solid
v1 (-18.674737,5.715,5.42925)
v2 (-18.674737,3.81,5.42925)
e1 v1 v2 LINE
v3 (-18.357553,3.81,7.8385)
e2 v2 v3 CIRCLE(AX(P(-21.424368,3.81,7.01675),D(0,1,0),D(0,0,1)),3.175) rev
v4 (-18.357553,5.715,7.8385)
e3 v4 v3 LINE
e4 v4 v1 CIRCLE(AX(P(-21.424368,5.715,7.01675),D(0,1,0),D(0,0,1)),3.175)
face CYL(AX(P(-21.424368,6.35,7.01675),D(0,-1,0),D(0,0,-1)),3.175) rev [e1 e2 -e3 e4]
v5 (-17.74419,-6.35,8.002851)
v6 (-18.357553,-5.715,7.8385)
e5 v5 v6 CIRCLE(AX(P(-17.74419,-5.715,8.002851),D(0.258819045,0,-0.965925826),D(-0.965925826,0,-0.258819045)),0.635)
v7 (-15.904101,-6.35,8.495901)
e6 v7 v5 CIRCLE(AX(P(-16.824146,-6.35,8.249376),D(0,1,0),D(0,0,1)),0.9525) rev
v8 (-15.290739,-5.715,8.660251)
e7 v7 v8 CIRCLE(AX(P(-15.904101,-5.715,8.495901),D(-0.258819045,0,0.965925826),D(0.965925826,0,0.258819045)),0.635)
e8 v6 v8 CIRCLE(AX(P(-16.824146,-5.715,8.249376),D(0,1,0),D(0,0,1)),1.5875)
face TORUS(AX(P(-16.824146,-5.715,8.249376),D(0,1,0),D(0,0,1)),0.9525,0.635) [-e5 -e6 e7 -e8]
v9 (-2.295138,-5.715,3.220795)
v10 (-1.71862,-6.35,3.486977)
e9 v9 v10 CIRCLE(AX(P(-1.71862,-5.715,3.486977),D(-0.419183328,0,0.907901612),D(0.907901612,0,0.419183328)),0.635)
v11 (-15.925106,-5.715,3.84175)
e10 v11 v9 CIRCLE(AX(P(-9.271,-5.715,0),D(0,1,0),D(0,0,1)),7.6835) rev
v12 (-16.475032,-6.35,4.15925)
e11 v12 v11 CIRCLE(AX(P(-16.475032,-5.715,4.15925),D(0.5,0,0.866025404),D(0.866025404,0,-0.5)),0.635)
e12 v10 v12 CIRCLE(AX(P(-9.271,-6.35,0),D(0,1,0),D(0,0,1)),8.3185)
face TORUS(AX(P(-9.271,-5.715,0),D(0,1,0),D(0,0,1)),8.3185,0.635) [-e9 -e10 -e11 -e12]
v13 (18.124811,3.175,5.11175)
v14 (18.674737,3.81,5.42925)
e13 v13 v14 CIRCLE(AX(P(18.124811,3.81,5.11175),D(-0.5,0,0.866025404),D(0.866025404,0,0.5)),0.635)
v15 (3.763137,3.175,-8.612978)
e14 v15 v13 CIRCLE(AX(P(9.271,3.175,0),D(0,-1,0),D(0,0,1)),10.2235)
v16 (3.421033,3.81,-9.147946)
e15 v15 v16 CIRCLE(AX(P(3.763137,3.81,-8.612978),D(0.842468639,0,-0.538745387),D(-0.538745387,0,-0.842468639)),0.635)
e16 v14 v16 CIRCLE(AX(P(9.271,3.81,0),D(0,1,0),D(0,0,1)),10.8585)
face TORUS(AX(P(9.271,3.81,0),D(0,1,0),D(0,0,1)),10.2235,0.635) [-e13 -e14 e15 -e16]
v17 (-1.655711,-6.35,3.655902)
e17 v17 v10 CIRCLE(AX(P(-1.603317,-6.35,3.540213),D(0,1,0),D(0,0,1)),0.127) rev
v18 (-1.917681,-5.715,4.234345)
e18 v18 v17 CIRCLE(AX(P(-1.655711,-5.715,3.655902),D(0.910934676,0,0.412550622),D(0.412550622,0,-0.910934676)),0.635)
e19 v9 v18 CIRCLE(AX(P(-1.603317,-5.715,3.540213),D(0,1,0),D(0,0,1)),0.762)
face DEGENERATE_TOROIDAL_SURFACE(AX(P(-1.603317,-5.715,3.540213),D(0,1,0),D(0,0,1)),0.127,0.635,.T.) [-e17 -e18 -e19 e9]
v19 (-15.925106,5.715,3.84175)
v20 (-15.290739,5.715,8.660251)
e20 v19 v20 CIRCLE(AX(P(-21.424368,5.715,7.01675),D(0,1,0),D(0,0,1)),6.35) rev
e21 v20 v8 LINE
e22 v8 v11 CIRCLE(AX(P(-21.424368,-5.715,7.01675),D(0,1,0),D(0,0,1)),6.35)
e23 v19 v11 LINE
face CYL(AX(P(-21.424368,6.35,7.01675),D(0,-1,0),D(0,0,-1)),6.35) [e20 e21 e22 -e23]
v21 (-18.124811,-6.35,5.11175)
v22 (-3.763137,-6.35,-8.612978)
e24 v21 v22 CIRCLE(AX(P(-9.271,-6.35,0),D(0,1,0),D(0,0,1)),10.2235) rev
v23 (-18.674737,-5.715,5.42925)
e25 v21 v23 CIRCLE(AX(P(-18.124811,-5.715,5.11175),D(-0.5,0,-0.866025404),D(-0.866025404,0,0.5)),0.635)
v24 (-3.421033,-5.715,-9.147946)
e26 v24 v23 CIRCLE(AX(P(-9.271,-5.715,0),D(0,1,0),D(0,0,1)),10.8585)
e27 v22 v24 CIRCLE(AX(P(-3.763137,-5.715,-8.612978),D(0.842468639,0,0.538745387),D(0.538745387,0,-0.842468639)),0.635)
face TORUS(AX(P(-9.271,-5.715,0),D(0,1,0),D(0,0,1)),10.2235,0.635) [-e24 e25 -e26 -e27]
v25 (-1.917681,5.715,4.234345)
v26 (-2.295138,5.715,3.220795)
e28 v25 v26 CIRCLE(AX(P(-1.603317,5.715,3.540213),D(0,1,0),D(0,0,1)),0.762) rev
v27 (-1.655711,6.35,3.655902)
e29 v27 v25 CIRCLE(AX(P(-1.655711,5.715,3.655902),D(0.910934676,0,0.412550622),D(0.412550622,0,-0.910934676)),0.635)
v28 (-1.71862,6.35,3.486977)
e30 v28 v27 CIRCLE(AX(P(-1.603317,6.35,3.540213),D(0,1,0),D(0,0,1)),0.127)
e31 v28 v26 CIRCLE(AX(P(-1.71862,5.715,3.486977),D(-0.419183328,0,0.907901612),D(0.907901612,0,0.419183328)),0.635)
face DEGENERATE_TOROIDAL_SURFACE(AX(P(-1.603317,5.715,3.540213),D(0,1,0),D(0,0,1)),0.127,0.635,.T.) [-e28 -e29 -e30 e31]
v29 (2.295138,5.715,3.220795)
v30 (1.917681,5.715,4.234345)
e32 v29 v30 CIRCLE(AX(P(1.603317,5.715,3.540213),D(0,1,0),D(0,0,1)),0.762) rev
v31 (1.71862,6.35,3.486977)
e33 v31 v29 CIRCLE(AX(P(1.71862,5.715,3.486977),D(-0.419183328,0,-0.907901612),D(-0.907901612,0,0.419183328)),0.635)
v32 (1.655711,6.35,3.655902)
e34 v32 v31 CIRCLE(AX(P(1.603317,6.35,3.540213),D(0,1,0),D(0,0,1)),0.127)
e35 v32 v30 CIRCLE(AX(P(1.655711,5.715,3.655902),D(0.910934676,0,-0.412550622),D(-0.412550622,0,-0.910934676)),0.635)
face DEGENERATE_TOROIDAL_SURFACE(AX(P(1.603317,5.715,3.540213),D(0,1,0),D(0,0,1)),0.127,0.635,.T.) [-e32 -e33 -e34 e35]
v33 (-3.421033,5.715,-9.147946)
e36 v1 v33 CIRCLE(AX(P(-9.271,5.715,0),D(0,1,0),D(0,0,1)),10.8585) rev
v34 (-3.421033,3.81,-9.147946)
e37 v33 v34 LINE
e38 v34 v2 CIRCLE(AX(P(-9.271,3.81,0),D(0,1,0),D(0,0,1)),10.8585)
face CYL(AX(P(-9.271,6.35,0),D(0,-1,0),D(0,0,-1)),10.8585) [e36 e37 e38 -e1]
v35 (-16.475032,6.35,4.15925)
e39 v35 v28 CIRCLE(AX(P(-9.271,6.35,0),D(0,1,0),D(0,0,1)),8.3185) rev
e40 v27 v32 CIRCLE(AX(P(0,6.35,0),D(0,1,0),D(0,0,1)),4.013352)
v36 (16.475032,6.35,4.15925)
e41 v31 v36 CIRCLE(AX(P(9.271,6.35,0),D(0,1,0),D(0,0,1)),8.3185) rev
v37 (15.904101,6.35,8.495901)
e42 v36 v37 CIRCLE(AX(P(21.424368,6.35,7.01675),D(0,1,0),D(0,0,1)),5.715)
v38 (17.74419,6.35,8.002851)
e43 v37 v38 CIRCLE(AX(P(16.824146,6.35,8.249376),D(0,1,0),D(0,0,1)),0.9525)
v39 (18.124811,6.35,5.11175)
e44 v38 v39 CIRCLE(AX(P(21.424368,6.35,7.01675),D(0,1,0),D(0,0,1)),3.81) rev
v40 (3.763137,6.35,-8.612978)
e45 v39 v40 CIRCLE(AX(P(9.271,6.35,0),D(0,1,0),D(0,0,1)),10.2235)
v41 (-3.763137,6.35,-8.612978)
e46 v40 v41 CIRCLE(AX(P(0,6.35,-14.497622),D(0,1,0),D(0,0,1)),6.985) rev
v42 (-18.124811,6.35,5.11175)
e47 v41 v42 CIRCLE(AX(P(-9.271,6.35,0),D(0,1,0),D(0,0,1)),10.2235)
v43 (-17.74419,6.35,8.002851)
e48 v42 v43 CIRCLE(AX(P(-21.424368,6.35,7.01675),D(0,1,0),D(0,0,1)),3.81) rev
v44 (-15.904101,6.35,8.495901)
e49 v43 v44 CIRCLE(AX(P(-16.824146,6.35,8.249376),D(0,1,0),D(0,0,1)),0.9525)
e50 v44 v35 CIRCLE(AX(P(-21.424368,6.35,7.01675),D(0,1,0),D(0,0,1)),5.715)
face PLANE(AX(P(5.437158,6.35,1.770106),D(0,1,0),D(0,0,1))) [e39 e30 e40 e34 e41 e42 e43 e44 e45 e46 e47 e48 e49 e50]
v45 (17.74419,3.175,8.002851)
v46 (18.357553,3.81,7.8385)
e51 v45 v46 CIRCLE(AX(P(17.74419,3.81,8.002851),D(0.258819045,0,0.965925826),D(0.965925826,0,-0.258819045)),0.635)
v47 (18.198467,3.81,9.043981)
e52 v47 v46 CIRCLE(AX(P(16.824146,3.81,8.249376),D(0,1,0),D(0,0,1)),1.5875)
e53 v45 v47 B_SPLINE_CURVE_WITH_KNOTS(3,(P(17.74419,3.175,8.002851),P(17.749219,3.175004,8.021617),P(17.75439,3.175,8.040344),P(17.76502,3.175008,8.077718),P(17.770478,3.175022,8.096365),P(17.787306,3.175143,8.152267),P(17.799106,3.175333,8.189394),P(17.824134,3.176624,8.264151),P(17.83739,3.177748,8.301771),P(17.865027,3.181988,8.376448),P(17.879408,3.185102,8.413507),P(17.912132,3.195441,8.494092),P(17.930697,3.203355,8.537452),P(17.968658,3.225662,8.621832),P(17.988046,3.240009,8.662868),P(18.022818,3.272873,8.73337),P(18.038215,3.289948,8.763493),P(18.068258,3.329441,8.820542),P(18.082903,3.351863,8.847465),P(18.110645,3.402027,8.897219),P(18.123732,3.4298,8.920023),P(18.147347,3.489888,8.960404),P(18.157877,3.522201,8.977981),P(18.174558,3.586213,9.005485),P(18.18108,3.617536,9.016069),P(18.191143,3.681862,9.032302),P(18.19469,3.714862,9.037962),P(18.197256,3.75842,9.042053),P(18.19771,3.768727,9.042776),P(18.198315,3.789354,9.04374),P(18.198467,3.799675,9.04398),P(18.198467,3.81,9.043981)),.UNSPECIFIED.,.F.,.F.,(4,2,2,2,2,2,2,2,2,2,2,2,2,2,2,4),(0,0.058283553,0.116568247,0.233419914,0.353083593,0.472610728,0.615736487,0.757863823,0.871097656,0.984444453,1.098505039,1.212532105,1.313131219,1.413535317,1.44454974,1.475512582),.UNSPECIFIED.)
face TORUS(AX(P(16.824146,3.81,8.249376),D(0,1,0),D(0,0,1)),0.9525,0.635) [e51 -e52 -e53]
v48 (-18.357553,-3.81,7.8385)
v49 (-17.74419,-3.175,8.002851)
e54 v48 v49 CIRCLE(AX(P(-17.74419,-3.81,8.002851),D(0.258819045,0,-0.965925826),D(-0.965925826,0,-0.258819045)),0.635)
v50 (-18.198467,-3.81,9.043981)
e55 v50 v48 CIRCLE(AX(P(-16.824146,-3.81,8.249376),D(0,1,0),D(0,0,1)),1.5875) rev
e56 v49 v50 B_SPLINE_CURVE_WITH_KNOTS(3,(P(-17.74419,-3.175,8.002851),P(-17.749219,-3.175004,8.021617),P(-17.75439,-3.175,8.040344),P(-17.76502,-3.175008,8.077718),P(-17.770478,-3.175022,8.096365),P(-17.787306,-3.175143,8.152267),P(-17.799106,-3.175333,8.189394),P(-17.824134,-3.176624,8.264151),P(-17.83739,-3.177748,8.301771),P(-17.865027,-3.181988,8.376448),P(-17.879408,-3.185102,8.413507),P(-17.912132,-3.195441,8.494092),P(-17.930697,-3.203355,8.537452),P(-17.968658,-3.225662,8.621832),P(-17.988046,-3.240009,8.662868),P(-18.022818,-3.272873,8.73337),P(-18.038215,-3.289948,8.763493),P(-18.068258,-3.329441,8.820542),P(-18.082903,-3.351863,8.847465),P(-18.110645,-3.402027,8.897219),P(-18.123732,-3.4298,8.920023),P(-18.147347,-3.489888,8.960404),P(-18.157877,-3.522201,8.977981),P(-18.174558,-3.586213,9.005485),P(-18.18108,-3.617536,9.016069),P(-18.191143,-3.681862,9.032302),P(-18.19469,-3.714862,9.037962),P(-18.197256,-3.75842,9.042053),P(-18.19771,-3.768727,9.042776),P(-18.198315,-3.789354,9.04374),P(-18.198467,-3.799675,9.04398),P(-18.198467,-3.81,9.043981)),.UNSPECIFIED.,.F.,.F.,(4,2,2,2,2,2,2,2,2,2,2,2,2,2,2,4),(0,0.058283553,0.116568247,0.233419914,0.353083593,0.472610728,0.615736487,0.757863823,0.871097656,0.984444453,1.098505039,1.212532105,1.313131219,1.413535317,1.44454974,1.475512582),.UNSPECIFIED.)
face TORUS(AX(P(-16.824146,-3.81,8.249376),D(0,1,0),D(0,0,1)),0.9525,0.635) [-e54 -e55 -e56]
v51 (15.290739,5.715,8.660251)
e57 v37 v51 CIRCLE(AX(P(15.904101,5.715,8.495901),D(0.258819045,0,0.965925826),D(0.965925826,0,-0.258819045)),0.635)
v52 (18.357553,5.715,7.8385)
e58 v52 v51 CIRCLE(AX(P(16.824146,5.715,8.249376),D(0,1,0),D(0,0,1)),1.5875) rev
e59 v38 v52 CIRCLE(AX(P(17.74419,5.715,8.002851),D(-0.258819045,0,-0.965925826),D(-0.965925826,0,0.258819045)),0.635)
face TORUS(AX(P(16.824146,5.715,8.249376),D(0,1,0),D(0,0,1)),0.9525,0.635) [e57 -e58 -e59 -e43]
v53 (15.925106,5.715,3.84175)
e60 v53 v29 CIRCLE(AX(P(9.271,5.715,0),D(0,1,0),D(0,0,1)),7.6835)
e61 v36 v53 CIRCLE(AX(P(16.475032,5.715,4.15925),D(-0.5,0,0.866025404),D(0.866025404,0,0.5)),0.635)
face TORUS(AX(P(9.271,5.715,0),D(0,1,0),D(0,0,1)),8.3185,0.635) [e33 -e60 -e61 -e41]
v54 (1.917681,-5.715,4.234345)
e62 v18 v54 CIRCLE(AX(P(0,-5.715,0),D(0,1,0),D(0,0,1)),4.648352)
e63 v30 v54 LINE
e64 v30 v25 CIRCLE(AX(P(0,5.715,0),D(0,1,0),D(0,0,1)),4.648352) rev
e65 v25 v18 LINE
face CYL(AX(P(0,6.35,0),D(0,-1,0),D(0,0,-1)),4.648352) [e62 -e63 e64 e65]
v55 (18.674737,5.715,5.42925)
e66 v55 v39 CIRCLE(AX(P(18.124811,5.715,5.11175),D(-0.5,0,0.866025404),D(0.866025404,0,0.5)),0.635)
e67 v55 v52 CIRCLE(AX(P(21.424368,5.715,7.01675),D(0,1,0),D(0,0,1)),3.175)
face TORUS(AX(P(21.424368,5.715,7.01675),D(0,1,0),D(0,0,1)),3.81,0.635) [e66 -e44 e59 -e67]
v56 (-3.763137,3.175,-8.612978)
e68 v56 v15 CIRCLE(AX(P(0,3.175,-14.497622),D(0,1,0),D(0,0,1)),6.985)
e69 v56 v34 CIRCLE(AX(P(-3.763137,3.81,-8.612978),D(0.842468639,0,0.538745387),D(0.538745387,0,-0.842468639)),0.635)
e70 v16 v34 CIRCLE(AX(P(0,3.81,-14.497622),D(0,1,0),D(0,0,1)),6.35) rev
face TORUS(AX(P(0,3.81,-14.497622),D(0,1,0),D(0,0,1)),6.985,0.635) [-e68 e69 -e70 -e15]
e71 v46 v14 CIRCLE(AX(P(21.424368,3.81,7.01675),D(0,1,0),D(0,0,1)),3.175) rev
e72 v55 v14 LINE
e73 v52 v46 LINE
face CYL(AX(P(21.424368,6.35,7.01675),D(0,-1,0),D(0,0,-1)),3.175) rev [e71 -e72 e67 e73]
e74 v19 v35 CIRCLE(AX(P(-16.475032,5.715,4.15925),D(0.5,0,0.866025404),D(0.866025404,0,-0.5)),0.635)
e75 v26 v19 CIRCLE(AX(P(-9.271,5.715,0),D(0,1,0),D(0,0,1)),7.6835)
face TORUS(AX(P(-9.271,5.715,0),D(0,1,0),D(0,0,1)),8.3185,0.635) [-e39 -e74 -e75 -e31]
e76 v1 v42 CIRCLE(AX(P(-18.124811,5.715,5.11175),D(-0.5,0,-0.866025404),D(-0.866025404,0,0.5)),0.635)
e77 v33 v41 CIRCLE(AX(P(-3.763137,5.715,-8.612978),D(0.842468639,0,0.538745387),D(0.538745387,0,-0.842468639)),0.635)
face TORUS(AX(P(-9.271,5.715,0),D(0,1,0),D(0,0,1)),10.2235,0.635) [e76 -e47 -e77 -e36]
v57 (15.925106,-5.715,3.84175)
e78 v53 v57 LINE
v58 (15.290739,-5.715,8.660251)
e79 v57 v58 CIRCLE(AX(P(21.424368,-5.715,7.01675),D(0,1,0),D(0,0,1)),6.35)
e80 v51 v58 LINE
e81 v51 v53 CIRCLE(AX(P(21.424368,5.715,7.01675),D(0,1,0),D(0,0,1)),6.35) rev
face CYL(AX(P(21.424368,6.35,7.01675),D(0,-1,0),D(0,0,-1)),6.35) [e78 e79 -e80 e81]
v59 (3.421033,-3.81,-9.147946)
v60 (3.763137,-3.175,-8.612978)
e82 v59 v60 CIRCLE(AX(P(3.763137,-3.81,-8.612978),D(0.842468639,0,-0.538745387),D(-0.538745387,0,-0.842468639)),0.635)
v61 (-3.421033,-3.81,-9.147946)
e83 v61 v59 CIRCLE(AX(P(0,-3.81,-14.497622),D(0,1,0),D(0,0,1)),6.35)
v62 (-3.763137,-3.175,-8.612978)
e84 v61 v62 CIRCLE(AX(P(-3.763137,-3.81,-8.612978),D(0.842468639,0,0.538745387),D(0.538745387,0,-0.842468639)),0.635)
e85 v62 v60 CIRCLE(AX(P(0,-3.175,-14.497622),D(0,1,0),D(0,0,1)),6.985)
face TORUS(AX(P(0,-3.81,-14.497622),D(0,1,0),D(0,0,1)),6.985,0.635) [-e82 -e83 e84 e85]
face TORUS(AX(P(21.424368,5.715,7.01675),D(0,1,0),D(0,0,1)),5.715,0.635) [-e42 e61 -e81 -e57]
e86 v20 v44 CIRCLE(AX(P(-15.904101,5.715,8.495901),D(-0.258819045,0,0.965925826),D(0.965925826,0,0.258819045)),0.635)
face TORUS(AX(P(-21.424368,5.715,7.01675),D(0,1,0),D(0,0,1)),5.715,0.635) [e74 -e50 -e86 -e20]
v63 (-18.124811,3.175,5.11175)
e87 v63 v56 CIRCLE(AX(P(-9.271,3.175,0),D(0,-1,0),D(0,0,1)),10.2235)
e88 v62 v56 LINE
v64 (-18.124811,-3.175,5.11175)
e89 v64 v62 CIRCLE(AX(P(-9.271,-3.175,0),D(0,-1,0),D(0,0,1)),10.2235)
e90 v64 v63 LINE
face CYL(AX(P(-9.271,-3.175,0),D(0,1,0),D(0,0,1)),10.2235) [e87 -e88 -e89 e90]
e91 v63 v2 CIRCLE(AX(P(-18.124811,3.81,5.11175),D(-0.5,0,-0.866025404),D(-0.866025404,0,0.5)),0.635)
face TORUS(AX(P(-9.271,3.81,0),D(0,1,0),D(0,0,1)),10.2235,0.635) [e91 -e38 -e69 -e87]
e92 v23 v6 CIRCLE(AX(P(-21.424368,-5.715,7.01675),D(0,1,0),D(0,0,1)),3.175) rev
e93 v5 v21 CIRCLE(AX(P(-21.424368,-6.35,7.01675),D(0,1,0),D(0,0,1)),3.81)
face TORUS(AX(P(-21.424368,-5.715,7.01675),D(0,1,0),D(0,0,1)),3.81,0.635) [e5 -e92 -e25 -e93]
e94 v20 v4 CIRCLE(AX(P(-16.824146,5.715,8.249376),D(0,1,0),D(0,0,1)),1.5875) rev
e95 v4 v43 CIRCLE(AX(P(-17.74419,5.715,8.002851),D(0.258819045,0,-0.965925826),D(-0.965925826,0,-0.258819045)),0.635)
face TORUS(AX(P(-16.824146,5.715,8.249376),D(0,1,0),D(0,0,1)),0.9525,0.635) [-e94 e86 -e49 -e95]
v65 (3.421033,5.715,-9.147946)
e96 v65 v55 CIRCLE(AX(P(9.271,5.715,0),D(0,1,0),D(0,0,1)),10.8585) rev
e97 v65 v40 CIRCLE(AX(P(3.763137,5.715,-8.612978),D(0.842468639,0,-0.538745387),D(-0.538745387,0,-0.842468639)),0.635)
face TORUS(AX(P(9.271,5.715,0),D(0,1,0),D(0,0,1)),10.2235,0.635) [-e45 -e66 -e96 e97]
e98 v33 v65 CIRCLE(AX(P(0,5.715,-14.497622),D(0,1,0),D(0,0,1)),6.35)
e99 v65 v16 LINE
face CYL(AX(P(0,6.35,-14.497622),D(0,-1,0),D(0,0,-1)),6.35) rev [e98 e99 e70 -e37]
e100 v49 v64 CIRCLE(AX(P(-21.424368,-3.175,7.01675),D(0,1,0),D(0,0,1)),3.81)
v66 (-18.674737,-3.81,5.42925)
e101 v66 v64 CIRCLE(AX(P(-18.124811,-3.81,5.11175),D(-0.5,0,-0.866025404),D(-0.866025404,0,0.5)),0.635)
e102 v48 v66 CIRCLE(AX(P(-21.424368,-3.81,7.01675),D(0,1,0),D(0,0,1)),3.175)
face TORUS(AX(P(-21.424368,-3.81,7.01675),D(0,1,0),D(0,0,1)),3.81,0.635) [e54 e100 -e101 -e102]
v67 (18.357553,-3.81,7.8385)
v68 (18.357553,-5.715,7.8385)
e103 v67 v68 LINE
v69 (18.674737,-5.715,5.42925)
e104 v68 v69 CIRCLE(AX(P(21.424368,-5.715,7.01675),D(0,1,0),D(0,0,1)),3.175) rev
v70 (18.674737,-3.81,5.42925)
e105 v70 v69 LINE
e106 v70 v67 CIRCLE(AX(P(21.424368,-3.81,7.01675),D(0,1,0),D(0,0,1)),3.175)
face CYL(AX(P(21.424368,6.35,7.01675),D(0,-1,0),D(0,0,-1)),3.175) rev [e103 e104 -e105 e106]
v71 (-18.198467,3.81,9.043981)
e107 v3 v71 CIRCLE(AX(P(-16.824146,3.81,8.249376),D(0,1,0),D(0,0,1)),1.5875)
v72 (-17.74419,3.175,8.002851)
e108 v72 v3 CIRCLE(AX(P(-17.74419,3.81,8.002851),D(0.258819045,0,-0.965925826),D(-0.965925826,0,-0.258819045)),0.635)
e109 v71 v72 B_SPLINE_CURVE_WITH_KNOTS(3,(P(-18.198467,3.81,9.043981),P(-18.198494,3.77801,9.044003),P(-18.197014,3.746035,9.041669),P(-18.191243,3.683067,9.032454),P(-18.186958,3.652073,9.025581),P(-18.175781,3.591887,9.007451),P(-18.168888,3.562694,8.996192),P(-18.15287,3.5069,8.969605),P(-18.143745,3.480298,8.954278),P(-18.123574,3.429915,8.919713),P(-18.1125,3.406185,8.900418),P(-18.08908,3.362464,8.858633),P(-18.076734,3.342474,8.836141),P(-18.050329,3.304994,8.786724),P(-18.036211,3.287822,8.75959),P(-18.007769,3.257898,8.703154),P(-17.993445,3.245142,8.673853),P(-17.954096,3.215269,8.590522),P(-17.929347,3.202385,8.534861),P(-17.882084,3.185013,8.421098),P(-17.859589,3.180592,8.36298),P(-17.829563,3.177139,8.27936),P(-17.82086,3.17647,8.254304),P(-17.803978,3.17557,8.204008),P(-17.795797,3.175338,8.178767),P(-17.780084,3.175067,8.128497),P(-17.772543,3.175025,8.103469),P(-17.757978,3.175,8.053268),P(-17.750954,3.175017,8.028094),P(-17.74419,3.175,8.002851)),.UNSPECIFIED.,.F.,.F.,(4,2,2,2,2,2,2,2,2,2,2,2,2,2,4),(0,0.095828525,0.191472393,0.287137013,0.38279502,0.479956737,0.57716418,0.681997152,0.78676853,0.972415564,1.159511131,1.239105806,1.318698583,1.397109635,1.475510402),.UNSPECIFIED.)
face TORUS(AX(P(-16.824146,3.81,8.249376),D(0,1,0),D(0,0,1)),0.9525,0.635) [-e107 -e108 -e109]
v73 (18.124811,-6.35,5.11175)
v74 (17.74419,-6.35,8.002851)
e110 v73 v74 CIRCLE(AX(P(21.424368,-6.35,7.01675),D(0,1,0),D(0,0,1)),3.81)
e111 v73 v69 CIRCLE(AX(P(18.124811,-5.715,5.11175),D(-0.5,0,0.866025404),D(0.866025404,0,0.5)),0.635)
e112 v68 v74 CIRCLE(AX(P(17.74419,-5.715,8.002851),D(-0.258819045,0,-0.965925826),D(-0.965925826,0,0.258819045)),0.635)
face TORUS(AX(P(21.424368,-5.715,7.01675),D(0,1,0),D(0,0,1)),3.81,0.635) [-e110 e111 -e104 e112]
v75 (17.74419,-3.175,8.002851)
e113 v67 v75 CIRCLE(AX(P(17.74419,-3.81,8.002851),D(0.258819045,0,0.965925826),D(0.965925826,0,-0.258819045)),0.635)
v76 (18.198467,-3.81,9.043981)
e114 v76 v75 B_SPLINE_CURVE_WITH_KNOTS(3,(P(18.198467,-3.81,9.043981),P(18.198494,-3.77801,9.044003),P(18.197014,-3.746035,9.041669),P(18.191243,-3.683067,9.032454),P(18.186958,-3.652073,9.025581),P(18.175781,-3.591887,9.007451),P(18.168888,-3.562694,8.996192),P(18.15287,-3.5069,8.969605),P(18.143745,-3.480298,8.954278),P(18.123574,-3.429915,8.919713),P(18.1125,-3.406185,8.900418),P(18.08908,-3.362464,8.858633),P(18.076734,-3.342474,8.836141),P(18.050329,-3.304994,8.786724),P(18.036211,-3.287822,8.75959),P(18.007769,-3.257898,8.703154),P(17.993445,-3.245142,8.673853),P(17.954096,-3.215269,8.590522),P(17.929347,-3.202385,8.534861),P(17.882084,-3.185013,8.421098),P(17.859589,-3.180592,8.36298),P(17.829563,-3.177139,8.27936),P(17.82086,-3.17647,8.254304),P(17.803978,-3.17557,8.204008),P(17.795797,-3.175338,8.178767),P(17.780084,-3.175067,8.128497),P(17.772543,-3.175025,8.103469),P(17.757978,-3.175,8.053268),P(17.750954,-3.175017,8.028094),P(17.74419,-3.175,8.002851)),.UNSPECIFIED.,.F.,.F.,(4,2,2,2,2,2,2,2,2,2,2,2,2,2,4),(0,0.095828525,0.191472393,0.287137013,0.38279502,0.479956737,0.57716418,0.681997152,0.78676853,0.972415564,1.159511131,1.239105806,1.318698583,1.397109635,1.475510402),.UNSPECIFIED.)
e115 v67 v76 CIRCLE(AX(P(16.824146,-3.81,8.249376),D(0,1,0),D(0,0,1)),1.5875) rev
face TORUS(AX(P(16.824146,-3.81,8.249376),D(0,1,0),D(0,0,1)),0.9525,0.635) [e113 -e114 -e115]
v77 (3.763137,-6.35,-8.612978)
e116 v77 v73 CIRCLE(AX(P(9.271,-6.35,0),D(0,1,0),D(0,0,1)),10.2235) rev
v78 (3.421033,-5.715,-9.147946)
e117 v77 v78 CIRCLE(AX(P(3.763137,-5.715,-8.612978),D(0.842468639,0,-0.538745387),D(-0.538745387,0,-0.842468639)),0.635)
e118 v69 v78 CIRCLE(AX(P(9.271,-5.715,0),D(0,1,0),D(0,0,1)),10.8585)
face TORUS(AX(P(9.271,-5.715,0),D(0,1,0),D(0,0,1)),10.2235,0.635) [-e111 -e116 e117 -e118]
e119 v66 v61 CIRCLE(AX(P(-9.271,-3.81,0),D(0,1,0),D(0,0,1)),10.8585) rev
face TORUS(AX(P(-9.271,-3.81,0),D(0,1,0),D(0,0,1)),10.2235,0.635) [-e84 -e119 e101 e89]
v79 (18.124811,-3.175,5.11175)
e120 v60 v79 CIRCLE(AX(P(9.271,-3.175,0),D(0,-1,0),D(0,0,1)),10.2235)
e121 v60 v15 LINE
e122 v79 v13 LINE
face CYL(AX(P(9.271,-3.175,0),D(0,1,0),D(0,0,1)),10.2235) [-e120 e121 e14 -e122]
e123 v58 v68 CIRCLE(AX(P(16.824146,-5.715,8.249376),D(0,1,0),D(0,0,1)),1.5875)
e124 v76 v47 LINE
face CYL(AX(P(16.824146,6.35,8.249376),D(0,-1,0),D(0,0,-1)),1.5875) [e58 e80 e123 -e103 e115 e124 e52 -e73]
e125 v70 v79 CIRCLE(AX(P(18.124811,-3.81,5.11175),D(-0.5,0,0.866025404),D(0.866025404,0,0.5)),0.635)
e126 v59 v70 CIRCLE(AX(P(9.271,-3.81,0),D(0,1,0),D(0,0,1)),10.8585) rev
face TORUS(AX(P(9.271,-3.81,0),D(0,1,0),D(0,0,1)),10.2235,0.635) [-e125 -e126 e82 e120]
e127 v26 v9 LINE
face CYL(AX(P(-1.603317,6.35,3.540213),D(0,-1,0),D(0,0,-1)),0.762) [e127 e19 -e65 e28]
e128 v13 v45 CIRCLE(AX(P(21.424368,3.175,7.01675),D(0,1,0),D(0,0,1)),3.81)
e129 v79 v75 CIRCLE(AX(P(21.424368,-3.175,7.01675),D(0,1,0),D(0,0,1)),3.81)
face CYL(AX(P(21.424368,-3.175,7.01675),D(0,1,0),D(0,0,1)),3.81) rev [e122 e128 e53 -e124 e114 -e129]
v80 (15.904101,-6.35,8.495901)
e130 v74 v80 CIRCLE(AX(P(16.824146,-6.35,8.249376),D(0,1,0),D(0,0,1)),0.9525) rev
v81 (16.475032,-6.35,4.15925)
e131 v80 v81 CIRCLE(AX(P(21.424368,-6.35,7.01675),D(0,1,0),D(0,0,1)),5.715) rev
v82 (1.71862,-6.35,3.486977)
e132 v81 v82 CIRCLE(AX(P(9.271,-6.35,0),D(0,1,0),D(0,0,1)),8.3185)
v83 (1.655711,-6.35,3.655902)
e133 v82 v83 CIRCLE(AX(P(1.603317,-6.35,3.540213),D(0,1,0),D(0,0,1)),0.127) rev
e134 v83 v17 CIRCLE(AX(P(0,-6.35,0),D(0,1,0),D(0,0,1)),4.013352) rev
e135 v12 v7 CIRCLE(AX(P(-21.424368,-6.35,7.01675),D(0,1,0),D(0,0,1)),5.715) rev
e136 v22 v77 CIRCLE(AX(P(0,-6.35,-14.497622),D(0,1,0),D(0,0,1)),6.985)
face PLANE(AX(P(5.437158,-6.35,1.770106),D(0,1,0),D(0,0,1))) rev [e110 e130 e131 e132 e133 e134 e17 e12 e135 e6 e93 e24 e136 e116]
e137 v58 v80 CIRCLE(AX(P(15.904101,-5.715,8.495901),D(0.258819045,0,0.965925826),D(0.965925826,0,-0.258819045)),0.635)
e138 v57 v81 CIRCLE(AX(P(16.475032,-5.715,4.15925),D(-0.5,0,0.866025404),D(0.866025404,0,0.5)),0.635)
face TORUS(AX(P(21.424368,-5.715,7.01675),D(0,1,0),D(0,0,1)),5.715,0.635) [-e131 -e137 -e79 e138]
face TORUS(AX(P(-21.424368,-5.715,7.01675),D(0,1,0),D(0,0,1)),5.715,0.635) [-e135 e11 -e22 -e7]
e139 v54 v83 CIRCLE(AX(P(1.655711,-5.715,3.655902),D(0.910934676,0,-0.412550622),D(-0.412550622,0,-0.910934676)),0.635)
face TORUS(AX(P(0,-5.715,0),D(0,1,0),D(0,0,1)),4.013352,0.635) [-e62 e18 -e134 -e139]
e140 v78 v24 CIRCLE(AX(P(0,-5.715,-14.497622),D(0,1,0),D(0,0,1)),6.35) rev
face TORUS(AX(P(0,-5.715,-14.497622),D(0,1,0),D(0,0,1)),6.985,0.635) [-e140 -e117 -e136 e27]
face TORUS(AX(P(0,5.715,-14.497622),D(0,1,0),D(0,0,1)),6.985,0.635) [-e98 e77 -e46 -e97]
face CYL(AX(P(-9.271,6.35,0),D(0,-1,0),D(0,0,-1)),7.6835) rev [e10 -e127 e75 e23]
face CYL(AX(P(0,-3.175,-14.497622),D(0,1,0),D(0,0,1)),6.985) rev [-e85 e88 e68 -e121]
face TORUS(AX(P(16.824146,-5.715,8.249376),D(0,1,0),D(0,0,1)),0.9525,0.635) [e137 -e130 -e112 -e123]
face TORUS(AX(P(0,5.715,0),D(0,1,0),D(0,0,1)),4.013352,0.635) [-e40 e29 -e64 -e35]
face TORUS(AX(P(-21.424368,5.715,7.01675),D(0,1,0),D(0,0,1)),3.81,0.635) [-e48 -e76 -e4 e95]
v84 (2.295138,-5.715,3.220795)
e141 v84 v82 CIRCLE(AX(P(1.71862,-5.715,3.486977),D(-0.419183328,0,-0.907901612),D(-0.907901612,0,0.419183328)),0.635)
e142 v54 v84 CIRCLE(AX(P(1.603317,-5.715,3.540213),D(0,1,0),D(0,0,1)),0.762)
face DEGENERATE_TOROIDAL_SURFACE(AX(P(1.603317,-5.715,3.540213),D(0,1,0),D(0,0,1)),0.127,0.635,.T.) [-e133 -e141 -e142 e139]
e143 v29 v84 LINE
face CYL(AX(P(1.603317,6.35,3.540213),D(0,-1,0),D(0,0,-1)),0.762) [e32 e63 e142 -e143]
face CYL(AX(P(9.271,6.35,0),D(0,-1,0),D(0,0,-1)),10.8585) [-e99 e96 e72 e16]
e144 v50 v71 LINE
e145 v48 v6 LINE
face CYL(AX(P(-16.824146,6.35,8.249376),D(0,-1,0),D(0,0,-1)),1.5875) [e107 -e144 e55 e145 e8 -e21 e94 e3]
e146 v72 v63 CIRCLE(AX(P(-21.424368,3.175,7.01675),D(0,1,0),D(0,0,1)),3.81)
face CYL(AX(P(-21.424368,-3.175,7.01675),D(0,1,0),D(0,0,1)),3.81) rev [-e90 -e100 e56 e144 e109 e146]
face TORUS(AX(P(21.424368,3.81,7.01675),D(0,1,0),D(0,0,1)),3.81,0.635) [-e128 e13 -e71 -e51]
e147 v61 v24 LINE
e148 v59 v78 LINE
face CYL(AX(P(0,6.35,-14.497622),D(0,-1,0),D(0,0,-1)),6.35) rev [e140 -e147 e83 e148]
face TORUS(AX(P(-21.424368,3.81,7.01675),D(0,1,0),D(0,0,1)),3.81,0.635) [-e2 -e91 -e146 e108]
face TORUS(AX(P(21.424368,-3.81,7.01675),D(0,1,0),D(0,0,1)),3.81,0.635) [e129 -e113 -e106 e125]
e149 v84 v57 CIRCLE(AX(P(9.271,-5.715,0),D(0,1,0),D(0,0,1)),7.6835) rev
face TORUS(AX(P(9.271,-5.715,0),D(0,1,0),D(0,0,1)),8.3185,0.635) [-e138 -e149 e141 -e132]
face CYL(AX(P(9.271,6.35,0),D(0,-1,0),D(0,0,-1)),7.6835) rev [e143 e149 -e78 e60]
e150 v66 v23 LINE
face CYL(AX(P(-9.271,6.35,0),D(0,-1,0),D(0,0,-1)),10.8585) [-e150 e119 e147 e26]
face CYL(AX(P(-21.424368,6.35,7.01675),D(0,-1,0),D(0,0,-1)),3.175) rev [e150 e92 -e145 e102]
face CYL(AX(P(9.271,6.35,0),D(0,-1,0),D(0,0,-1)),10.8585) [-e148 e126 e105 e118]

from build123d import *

# Parameters (mm, degrees)
BOSS_EXTRUDE1_DEPTH = 6.35
FILLET1_R           = 0.635
CUT_EXTRUDE1_DEPTH  = 3.175
FILLET2_R           = 0.635


with BuildPart() as part:
    # Sketch1 → Boss-Extrude1 (new, symmetric)
    with BuildSketch(Plane(origin=(0, 0, 0), x_dir=(1, 0, 0), z_dir=(0, 1, 0))):
        with BuildLine():
            ThreePointArc((15.92510619, -3.84175), (9.620682646, 7.675538697), (2.295137962, -3.220795101))
            ThreePointArc((2.295137962, -3.220795101), (2.31740567, -3.806147519), (1.917680508, -4.23434502))
            ThreePointArc((1.917680508, -4.23434502), (0, -4.648351996), (-1.917680508, -4.23434502))
            ThreePointArc((-1.917680508, -4.23434502), (-2.31740567, -3.806147519), (-2.295137962, -3.220795101))
            ThreePointArc((-2.295137962, -3.220795101), (-9.620682646, 7.675538697), (-15.92510619, -3.84175))
            ThreePointArc((-15.92510619, -3.84175), (-15.128692634, -6.187908679), (-15.290738507, -8.660250936))
            ThreePointArc((-15.290738507, -8.660250936), (-17.23502099, -9.782782952), (-18.357553006, -7.838500468))
            ThreePointArc((-18.357553006, -7.838500468), (-18.276530069, -6.60232934), (-18.674736847, -5.42925))
            ThreePointArc((-18.674736847, -5.42925), (-16.773064991, 7.850225673), (-3.42103321, 9.147945715))
            ThreePointArc((-3.42103321, 9.147945715), (0, 8.147621572), (3.42103321, 9.147945715))
            ThreePointArc((3.42103321, 9.147945715), (16.773064991, 7.850225673), (18.674736847, -5.42925))
            ThreePointArc((18.674736847, -5.42925), (18.276530069, -6.60232934), (18.357553006, -7.838500468))
            ThreePointArc((18.357553006, -7.838500468), (17.23502099, -9.782782952), (15.290738507, -8.660250936))
            ThreePointArc((15.290738507, -8.660250936), (15.128692634, -6.187908679), (15.92510619, -3.84175))
        make_face()
    extrude(amount=BOSS_EXTRUDE1_DEPTH, both=True)

    # Fillet1
    fillet1_edges = [part.edges().sort_by_distance(p)[0] for p in [
        (15.128692634, 6.35, 6.187908679),
        (0, -6.35, 4.648351996),
        (-2.31740567, -6.35, 3.806147519),
        (-9.620682646, -6.35, -7.675538697),
        (-15.128692634, -6.35, 6.187908679),
        (-17.23502099, -6.35, 9.782782952),
        (-18.276530069, -6.35, 6.60232934),
        (-16.773064991, -6.35, -7.850225673),
        (0, -6.35, -8.147621572),
        (17.23502099, 6.35, 9.782782952),
        (16.773064991, -6.35, -7.850225673),
        (18.276530069, -6.35, 6.60232934),
        (17.23502099, -6.35, 9.782782952),
        (15.128692634, -6.35, 6.187908679),
        (9.620682646, -6.35, -7.675538697),
        (2.31740567, -6.35, 3.806147519),
        (18.276530069, 6.35, 6.60232934),
        (16.773064991, 6.35, -7.850225673),
        (0, 6.35, -8.147621572),
        (-16.773064991, 6.35, -7.850225673),
        (-18.276530069, 6.35, 6.60232934),
        (-17.23502099, 6.35, 9.782782952),
        (-15.128692634, 6.35, 6.187908679),
        (-9.620682646, 6.35, -7.675538697),
        (2.31740567, 6.35, 3.806147519),
        (-2.31740567, 6.35, 3.806147519),
        (0, 6.35, 4.648351996),
        (9.620682646, 6.35, -7.675538697),
    ]]
    fillet(fillet1_edges, radius=FILLET1_R)

    # Sketch2 → Cut-Extrude1 (cut, symmetric)
    with BuildSketch(Plane(origin=(0, 0, 0), x_dir=(1, 0, 0), z_dir=(0, 1, 0))):
        with BuildLine():
            ThreePointArc((-18.19846693, -9.043980989), (-17.615035727, -7.088104139), (-18.124810716, -5.11175))
            ThreePointArc((-18.124810716, -5.11175), (-16.33434774, 7.391148148), (-3.763136531, 8.61297813))
            ThreePointArc((-3.763136531, 8.61297813), (0, 7.512621572), (3.763136531, 8.61297813))
            ThreePointArc((3.763136531, 8.61297813), (16.33434774, 7.391148148), (18.124810716, -5.11175))
            ThreePointArc((18.124810716, -5.11175), (17.615035727, -7.088104139), (18.19846693, -9.043980989))
            ThreePointArc((18.19846693, -9.043980989), (18.397999932, -8.457075686), (18.357553006, -7.838500468))
            ThreePointArc((18.357553006, -7.838500468), (18.276530069, -6.60232934), (18.674736847, -5.42925))
            ThreePointArc((18.674736847, -5.42925), (16.773064991, 7.850225673), (3.42103321, 9.147945715))
            ThreePointArc((3.42103321, 9.147945715), (0, 8.147621572), (-3.42103321, 9.147945715))
            ThreePointArc((-3.42103321, 9.147945715), (-16.773064991, 7.850225673), (-18.674736847, -5.42925))
            ThreePointArc((-18.674736847, -5.42925), (-18.276530069, -6.60232934), (-18.357553006, -7.838500468))
            ThreePointArc((-18.357553006, -7.838500468), (-18.397999932, -8.457075686), (-18.19846693, -9.043980989))
        make_face()
    extrude(amount=CUT_EXTRUDE1_DEPTH, both=True, mode=Mode.SUBTRACT)

    # Fillet2
    # the kernel refuses this fillet: 0.635 mm, written as the material it takes off along each edge
    with BuildSketch(Plane(origin=(-16.824145756, -3.175, 8.249375702), x_dir=(-0.9659258262890679, 0, -0.2588190451025219), z_dir=(0.2588190451025219, 0, -0.9659258262890679))) as fillet2_piece_1_section:
        with BuildLine():
            CenterArc((1.5875 - FILLET2_R, -FILLET2_R), FILLET2_R, 0, 90)
            Line((1.5875, -FILLET2_R), (1.5875, 0))
            Line((1.5875, 0), (1.5875 - FILLET2_R, 0))
        make_face()
    fillet2_piece_1 = revolve(axis=Axis((-16.824145756, -3.175, 8.249375702), (0, 1, 0)), revolution_arc=102.337192181, mode=Mode.PRIVATE)
    fillet2_piece_1 = fillet2_piece_1 & Plane(origin=(-21.424367504, -3.334227922, 7.01675), x_dir=(0.84669306412483, 0, 0.5320816245303972), z_dir=(0, 1, 0)) * Cylinder(3.81, 7, mode=Mode.PRIVATE)
    add(fillet2_piece_1, mode=Mode.SUBTRACT)
    with BuildSketch(Plane(origin=(-21.424367504, -3.175, 7.01675), x_dir=(0.8660254037844375, 0, -0.500000000000002), z_dir=(-0.500000000000002, 0, -0.8660254037844375))) as fillet2_piece_2:
        with BuildLine():
            CenterArc((3.175 + FILLET2_R, FILLET2_R), FILLET2_R, 180, 90)
            Line((3.175, FILLET2_R), (3.175, 0))
            Line((3.175, 0), (3.175 + FILLET2_R, 0))
        make_face()
    revolve(axis=Axis((-21.424367504, -3.175, 7.01675), (0, -1, 0)), revolution_arc=45, mode=Mode.SUBTRACT)
    with BuildSketch(Plane(origin=(-9.271, -3.175, 0), x_dir=(0.5387453874538747, 0, -0.8424686388805072), z_dir=(0.8424686388805072, 0, 0.5387453874538747))) as fillet2_piece_3:
        with BuildLine():
            CenterArc((10.8585 - FILLET2_R, -FILLET2_R), FILLET2_R, 0, 90)
            Line((10.8585, -FILLET2_R), (10.8585, 0))
            Line((10.8585, 0), (10.8585 - FILLET2_R, 0))
        make_face()
    revolve(axis=Axis((-9.271, -3.175, 0), (0, 1, 0)), revolution_arc=152.598272711, mode=Mode.SUBTRACT)
    with BuildSketch(Plane(origin=(0, -3.175, -14.497621572), x_dir=(0.5387453874538746, 0, 0.8424686388805073), z_dir=(0.8424686388805073, 0, -0.5387453874538746))) as fillet2_piece_4:
        with BuildLine():
            CenterArc((6.35 + FILLET2_R, FILLET2_R), FILLET2_R, 180, 90)
            Line((6.35, FILLET2_R), (6.35, 0))
            Line((6.35, 0), (6.35 + FILLET2_R, 0))
        make_face()
    revolve(axis=Axis((0, -3.175, -14.497621572), (0, -1, 0)), revolution_arc=65.196545422, mode=Mode.SUBTRACT)
    with BuildSketch(Plane(origin=(9.271, -3.175, 0), x_dir=(0.866025403784438, 0, 0.500000000000001), z_dir=(-0.500000000000001, 0, 0.866025403784438))) as fillet2_piece_5:
        with BuildLine():
            CenterArc((10.8585 - FILLET2_R, -FILLET2_R), FILLET2_R, 0, 90)
            Line((10.8585 - FILLET2_R, 0), (10.8585, 0))
            Line((10.8585, 0), (10.8585, -FILLET2_R))
        make_face()
    revolve(axis=Axis((9.271, -3.175, 0), (0, 1, 0)), revolution_arc=152.598272711, mode=Mode.SUBTRACT)
    with BuildSketch(Plane(origin=(21.424367504, -3.175, 7.01675), x_dir=(-0.9659258262890693, 0, 0.2588190451025171), z_dir=(0.2588190451025171, 0, 0.9659258262890693))) as fillet2_piece_6:
        with BuildLine():
            CenterArc((3.175 + FILLET2_R, FILLET2_R), FILLET2_R, 180, 90)
            Line((3.175 + FILLET2_R, 0), (3.175, 0))
            Line((3.175, 0), (3.175, FILLET2_R))
        make_face()
    revolve(axis=Axis((21.424367504, -3.175, 7.01675), (0, -1, 0)), revolution_arc=45, mode=Mode.SUBTRACT)
    with BuildSketch(Plane(origin=(16.824145756, -3.175, 8.249375702), x_dir=(0.046458035422521964, 0, 0.9989202425342474), z_dir=(-0.9989202425342474, 0, 0.046458035422521964))) as fillet2_piece_7_section:
        with BuildLine():
            CenterArc((1.5875 - FILLET2_R, -FILLET2_R), FILLET2_R, 0, 90)
            Line((1.5875, -FILLET2_R), (1.5875, 0))
            Line((1.5875, 0), (1.5875 - FILLET2_R, 0))
        make_face()
    fillet2_piece_7 = revolve(axis=Axis((16.824145756, -3.175, 8.249375702), (0, 1, 0)), revolution_arc=102.337192181, mode=Mode.PRIVATE)
    fillet2_piece_7 = fillet2_piece_7 & Plane(origin=(21.424367504, -3.334227929, 7.01675), x_dir=(-0.8660254037844396, 0, -0.49999999999999833), z_dir=(0, 1, 0)) * Cylinder(3.81, 7, mode=Mode.PRIVATE)
    add(fillet2_piece_7, mode=Mode.SUBTRACT)
    with BuildSketch(Plane(origin=(16.824145756, 3.175, 8.249375702), x_dir=(0.046458035422521964, 0, 0.9989202425342474), z_dir=(-0.9989202425342474, 0, 0.046458035422521964))) as fillet2_piece_8_section:
        with BuildLine():
            CenterArc((1.5875 - FILLET2_R, FILLET2_R), FILLET2_R, 270, 90)
            Line((1.5875 - FILLET2_R, 0), (1.5875, 0))
            Line((1.5875, 0), (1.5875, FILLET2_R))
        make_face()
    fillet2_piece_8 = revolve(axis=Axis((16.824145756, 3.175, 8.249375702), (0, 1, 0)), revolution_arc=102.337192181, mode=Mode.PRIVATE)
    fillet2_piece_8 = fillet2_piece_8 & Plane(origin=(21.424367504, 3.334227929, 7.01675), x_dir=(-0.8660254037844396, 0, -0.49999999999999833), z_dir=(0, 1, 0)) * Cylinder(3.81, 7, mode=Mode.PRIVATE)
    add(fillet2_piece_8, mode=Mode.SUBTRACT)
    with BuildSketch(Plane(origin=(21.424367504, 3.175, 7.01675), x_dir=(-0.9659258262890693, 0, 0.2588190451025171), z_dir=(0.2588190451025171, 0, 0.9659258262890693))) as fillet2_piece_9:
        with BuildLine():
            CenterArc((3.175 + FILLET2_R, -FILLET2_R), FILLET2_R, 90, 90)
            Line((3.175, -FILLET2_R), (3.175, 0))
            Line((3.175, 0), (3.175 + FILLET2_R, 0))
        make_face()
    revolve(axis=Axis((21.424367504, 3.175, 7.01675), (0, -1, 0)), revolution_arc=45, mode=Mode.SUBTRACT)
    with BuildSketch(Plane(origin=(9.271, 3.175, 0), x_dir=(0.866025403784438, 0, 0.500000000000001), z_dir=(-0.500000000000001, 0, 0.866025403784438))) as fillet2_piece_10:
        with BuildLine():
            CenterArc((10.8585 - FILLET2_R, FILLET2_R), FILLET2_R, 270, 90)
            Line((10.8585, FILLET2_R), (10.8585, 0))
            Line((10.8585, 0), (10.8585 - FILLET2_R, 0))
        make_face()
    revolve(axis=Axis((9.271, 3.175, 0), (0, 1, 0)), revolution_arc=152.598272711, mode=Mode.SUBTRACT)
    with BuildSketch(Plane(origin=(0, 3.175, -14.497621572), x_dir=(0.5387453874538746, 0, 0.8424686388805073), z_dir=(0.8424686388805073, 0, -0.5387453874538746))) as fillet2_piece_11:
        with BuildLine():
            CenterArc((6.35 + FILLET2_R, -FILLET2_R), FILLET2_R, 90, 90)
            Line((6.35, -FILLET2_R), (6.35, 0))
            Line((6.35, 0), (6.35 + FILLET2_R, 0))
        make_face()
    revolve(axis=Axis((0, 3.175, -14.497621572), (0, -1, 0)), revolution_arc=65.196545422, mode=Mode.SUBTRACT)
    with BuildSketch(Plane(origin=(-9.271, 3.175, 0), x_dir=(0.5387453874538747, 0, -0.8424686388805072), z_dir=(0.8424686388805072, 0, 0.5387453874538747))) as fillet2_piece_12:
        with BuildLine():
            CenterArc((10.8585 - FILLET2_R, FILLET2_R), FILLET2_R, 270, 90)
            Line((10.8585, FILLET2_R), (10.8585, 0))
            Line((10.8585, 0), (10.8585 - FILLET2_R, 0))
        make_face()
    revolve(axis=Axis((-9.271, 3.175, 0), (0, 1, 0)), revolution_arc=152.598272711, mode=Mode.SUBTRACT)
    with BuildSketch(Plane(origin=(-21.424367504, 3.175, 7.01675), x_dir=(0.8660254037844375, 0, -0.500000000000002), z_dir=(-0.500000000000002, 0, -0.8660254037844375))) as fillet2_piece_13:
        with BuildLine():
            CenterArc((3.175 + FILLET2_R, -FILLET2_R), FILLET2_R, 90, 90)
            Line((3.175, -FILLET2_R), (3.175, 0))
            Line((3.175, 0), (3.175 + FILLET2_R, 0))
        make_face()
    revolve(axis=Axis((-21.424367504, 3.175, 7.01675), (0, -1, 0)), revolution_arc=45, mode=Mode.SUBTRACT)
    with BuildSketch(Plane(origin=(-16.824145756, 3.175, 8.249375702), x_dir=(-0.9659258262890679, 0, -0.2588190451025219), z_dir=(0.2588190451025219, 0, -0.9659258262890679))) as fillet2_piece_14_section:
        with BuildLine():
            CenterArc((1.5875 - FILLET2_R, FILLET2_R), FILLET2_R, 270, 90)
            Line((1.5875 - FILLET2_R, 0), (1.5875, 0))
            Line((1.5875, 0), (1.5875, FILLET2_R))
        make_face()
    fillet2_piece_14 = revolve(axis=Axis((-16.824145756, 3.175, 8.249375702), (0, 1, 0)), revolution_arc=102.337192181, mode=Mode.PRIVATE)
    fillet2_piece_14 = fillet2_piece_14 & Plane(origin=(-21.424367504, 3.334227922, 7.01675), x_dir=(0.84669306412483, 0, 0.5320816245303972), z_dir=(0, 1, 0)) * Cylinder(3.81, 7, mode=Mode.PRIVATE)
    add(fillet2_piece_14, mode=Mode.SUBTRACT)


solid = part.part
